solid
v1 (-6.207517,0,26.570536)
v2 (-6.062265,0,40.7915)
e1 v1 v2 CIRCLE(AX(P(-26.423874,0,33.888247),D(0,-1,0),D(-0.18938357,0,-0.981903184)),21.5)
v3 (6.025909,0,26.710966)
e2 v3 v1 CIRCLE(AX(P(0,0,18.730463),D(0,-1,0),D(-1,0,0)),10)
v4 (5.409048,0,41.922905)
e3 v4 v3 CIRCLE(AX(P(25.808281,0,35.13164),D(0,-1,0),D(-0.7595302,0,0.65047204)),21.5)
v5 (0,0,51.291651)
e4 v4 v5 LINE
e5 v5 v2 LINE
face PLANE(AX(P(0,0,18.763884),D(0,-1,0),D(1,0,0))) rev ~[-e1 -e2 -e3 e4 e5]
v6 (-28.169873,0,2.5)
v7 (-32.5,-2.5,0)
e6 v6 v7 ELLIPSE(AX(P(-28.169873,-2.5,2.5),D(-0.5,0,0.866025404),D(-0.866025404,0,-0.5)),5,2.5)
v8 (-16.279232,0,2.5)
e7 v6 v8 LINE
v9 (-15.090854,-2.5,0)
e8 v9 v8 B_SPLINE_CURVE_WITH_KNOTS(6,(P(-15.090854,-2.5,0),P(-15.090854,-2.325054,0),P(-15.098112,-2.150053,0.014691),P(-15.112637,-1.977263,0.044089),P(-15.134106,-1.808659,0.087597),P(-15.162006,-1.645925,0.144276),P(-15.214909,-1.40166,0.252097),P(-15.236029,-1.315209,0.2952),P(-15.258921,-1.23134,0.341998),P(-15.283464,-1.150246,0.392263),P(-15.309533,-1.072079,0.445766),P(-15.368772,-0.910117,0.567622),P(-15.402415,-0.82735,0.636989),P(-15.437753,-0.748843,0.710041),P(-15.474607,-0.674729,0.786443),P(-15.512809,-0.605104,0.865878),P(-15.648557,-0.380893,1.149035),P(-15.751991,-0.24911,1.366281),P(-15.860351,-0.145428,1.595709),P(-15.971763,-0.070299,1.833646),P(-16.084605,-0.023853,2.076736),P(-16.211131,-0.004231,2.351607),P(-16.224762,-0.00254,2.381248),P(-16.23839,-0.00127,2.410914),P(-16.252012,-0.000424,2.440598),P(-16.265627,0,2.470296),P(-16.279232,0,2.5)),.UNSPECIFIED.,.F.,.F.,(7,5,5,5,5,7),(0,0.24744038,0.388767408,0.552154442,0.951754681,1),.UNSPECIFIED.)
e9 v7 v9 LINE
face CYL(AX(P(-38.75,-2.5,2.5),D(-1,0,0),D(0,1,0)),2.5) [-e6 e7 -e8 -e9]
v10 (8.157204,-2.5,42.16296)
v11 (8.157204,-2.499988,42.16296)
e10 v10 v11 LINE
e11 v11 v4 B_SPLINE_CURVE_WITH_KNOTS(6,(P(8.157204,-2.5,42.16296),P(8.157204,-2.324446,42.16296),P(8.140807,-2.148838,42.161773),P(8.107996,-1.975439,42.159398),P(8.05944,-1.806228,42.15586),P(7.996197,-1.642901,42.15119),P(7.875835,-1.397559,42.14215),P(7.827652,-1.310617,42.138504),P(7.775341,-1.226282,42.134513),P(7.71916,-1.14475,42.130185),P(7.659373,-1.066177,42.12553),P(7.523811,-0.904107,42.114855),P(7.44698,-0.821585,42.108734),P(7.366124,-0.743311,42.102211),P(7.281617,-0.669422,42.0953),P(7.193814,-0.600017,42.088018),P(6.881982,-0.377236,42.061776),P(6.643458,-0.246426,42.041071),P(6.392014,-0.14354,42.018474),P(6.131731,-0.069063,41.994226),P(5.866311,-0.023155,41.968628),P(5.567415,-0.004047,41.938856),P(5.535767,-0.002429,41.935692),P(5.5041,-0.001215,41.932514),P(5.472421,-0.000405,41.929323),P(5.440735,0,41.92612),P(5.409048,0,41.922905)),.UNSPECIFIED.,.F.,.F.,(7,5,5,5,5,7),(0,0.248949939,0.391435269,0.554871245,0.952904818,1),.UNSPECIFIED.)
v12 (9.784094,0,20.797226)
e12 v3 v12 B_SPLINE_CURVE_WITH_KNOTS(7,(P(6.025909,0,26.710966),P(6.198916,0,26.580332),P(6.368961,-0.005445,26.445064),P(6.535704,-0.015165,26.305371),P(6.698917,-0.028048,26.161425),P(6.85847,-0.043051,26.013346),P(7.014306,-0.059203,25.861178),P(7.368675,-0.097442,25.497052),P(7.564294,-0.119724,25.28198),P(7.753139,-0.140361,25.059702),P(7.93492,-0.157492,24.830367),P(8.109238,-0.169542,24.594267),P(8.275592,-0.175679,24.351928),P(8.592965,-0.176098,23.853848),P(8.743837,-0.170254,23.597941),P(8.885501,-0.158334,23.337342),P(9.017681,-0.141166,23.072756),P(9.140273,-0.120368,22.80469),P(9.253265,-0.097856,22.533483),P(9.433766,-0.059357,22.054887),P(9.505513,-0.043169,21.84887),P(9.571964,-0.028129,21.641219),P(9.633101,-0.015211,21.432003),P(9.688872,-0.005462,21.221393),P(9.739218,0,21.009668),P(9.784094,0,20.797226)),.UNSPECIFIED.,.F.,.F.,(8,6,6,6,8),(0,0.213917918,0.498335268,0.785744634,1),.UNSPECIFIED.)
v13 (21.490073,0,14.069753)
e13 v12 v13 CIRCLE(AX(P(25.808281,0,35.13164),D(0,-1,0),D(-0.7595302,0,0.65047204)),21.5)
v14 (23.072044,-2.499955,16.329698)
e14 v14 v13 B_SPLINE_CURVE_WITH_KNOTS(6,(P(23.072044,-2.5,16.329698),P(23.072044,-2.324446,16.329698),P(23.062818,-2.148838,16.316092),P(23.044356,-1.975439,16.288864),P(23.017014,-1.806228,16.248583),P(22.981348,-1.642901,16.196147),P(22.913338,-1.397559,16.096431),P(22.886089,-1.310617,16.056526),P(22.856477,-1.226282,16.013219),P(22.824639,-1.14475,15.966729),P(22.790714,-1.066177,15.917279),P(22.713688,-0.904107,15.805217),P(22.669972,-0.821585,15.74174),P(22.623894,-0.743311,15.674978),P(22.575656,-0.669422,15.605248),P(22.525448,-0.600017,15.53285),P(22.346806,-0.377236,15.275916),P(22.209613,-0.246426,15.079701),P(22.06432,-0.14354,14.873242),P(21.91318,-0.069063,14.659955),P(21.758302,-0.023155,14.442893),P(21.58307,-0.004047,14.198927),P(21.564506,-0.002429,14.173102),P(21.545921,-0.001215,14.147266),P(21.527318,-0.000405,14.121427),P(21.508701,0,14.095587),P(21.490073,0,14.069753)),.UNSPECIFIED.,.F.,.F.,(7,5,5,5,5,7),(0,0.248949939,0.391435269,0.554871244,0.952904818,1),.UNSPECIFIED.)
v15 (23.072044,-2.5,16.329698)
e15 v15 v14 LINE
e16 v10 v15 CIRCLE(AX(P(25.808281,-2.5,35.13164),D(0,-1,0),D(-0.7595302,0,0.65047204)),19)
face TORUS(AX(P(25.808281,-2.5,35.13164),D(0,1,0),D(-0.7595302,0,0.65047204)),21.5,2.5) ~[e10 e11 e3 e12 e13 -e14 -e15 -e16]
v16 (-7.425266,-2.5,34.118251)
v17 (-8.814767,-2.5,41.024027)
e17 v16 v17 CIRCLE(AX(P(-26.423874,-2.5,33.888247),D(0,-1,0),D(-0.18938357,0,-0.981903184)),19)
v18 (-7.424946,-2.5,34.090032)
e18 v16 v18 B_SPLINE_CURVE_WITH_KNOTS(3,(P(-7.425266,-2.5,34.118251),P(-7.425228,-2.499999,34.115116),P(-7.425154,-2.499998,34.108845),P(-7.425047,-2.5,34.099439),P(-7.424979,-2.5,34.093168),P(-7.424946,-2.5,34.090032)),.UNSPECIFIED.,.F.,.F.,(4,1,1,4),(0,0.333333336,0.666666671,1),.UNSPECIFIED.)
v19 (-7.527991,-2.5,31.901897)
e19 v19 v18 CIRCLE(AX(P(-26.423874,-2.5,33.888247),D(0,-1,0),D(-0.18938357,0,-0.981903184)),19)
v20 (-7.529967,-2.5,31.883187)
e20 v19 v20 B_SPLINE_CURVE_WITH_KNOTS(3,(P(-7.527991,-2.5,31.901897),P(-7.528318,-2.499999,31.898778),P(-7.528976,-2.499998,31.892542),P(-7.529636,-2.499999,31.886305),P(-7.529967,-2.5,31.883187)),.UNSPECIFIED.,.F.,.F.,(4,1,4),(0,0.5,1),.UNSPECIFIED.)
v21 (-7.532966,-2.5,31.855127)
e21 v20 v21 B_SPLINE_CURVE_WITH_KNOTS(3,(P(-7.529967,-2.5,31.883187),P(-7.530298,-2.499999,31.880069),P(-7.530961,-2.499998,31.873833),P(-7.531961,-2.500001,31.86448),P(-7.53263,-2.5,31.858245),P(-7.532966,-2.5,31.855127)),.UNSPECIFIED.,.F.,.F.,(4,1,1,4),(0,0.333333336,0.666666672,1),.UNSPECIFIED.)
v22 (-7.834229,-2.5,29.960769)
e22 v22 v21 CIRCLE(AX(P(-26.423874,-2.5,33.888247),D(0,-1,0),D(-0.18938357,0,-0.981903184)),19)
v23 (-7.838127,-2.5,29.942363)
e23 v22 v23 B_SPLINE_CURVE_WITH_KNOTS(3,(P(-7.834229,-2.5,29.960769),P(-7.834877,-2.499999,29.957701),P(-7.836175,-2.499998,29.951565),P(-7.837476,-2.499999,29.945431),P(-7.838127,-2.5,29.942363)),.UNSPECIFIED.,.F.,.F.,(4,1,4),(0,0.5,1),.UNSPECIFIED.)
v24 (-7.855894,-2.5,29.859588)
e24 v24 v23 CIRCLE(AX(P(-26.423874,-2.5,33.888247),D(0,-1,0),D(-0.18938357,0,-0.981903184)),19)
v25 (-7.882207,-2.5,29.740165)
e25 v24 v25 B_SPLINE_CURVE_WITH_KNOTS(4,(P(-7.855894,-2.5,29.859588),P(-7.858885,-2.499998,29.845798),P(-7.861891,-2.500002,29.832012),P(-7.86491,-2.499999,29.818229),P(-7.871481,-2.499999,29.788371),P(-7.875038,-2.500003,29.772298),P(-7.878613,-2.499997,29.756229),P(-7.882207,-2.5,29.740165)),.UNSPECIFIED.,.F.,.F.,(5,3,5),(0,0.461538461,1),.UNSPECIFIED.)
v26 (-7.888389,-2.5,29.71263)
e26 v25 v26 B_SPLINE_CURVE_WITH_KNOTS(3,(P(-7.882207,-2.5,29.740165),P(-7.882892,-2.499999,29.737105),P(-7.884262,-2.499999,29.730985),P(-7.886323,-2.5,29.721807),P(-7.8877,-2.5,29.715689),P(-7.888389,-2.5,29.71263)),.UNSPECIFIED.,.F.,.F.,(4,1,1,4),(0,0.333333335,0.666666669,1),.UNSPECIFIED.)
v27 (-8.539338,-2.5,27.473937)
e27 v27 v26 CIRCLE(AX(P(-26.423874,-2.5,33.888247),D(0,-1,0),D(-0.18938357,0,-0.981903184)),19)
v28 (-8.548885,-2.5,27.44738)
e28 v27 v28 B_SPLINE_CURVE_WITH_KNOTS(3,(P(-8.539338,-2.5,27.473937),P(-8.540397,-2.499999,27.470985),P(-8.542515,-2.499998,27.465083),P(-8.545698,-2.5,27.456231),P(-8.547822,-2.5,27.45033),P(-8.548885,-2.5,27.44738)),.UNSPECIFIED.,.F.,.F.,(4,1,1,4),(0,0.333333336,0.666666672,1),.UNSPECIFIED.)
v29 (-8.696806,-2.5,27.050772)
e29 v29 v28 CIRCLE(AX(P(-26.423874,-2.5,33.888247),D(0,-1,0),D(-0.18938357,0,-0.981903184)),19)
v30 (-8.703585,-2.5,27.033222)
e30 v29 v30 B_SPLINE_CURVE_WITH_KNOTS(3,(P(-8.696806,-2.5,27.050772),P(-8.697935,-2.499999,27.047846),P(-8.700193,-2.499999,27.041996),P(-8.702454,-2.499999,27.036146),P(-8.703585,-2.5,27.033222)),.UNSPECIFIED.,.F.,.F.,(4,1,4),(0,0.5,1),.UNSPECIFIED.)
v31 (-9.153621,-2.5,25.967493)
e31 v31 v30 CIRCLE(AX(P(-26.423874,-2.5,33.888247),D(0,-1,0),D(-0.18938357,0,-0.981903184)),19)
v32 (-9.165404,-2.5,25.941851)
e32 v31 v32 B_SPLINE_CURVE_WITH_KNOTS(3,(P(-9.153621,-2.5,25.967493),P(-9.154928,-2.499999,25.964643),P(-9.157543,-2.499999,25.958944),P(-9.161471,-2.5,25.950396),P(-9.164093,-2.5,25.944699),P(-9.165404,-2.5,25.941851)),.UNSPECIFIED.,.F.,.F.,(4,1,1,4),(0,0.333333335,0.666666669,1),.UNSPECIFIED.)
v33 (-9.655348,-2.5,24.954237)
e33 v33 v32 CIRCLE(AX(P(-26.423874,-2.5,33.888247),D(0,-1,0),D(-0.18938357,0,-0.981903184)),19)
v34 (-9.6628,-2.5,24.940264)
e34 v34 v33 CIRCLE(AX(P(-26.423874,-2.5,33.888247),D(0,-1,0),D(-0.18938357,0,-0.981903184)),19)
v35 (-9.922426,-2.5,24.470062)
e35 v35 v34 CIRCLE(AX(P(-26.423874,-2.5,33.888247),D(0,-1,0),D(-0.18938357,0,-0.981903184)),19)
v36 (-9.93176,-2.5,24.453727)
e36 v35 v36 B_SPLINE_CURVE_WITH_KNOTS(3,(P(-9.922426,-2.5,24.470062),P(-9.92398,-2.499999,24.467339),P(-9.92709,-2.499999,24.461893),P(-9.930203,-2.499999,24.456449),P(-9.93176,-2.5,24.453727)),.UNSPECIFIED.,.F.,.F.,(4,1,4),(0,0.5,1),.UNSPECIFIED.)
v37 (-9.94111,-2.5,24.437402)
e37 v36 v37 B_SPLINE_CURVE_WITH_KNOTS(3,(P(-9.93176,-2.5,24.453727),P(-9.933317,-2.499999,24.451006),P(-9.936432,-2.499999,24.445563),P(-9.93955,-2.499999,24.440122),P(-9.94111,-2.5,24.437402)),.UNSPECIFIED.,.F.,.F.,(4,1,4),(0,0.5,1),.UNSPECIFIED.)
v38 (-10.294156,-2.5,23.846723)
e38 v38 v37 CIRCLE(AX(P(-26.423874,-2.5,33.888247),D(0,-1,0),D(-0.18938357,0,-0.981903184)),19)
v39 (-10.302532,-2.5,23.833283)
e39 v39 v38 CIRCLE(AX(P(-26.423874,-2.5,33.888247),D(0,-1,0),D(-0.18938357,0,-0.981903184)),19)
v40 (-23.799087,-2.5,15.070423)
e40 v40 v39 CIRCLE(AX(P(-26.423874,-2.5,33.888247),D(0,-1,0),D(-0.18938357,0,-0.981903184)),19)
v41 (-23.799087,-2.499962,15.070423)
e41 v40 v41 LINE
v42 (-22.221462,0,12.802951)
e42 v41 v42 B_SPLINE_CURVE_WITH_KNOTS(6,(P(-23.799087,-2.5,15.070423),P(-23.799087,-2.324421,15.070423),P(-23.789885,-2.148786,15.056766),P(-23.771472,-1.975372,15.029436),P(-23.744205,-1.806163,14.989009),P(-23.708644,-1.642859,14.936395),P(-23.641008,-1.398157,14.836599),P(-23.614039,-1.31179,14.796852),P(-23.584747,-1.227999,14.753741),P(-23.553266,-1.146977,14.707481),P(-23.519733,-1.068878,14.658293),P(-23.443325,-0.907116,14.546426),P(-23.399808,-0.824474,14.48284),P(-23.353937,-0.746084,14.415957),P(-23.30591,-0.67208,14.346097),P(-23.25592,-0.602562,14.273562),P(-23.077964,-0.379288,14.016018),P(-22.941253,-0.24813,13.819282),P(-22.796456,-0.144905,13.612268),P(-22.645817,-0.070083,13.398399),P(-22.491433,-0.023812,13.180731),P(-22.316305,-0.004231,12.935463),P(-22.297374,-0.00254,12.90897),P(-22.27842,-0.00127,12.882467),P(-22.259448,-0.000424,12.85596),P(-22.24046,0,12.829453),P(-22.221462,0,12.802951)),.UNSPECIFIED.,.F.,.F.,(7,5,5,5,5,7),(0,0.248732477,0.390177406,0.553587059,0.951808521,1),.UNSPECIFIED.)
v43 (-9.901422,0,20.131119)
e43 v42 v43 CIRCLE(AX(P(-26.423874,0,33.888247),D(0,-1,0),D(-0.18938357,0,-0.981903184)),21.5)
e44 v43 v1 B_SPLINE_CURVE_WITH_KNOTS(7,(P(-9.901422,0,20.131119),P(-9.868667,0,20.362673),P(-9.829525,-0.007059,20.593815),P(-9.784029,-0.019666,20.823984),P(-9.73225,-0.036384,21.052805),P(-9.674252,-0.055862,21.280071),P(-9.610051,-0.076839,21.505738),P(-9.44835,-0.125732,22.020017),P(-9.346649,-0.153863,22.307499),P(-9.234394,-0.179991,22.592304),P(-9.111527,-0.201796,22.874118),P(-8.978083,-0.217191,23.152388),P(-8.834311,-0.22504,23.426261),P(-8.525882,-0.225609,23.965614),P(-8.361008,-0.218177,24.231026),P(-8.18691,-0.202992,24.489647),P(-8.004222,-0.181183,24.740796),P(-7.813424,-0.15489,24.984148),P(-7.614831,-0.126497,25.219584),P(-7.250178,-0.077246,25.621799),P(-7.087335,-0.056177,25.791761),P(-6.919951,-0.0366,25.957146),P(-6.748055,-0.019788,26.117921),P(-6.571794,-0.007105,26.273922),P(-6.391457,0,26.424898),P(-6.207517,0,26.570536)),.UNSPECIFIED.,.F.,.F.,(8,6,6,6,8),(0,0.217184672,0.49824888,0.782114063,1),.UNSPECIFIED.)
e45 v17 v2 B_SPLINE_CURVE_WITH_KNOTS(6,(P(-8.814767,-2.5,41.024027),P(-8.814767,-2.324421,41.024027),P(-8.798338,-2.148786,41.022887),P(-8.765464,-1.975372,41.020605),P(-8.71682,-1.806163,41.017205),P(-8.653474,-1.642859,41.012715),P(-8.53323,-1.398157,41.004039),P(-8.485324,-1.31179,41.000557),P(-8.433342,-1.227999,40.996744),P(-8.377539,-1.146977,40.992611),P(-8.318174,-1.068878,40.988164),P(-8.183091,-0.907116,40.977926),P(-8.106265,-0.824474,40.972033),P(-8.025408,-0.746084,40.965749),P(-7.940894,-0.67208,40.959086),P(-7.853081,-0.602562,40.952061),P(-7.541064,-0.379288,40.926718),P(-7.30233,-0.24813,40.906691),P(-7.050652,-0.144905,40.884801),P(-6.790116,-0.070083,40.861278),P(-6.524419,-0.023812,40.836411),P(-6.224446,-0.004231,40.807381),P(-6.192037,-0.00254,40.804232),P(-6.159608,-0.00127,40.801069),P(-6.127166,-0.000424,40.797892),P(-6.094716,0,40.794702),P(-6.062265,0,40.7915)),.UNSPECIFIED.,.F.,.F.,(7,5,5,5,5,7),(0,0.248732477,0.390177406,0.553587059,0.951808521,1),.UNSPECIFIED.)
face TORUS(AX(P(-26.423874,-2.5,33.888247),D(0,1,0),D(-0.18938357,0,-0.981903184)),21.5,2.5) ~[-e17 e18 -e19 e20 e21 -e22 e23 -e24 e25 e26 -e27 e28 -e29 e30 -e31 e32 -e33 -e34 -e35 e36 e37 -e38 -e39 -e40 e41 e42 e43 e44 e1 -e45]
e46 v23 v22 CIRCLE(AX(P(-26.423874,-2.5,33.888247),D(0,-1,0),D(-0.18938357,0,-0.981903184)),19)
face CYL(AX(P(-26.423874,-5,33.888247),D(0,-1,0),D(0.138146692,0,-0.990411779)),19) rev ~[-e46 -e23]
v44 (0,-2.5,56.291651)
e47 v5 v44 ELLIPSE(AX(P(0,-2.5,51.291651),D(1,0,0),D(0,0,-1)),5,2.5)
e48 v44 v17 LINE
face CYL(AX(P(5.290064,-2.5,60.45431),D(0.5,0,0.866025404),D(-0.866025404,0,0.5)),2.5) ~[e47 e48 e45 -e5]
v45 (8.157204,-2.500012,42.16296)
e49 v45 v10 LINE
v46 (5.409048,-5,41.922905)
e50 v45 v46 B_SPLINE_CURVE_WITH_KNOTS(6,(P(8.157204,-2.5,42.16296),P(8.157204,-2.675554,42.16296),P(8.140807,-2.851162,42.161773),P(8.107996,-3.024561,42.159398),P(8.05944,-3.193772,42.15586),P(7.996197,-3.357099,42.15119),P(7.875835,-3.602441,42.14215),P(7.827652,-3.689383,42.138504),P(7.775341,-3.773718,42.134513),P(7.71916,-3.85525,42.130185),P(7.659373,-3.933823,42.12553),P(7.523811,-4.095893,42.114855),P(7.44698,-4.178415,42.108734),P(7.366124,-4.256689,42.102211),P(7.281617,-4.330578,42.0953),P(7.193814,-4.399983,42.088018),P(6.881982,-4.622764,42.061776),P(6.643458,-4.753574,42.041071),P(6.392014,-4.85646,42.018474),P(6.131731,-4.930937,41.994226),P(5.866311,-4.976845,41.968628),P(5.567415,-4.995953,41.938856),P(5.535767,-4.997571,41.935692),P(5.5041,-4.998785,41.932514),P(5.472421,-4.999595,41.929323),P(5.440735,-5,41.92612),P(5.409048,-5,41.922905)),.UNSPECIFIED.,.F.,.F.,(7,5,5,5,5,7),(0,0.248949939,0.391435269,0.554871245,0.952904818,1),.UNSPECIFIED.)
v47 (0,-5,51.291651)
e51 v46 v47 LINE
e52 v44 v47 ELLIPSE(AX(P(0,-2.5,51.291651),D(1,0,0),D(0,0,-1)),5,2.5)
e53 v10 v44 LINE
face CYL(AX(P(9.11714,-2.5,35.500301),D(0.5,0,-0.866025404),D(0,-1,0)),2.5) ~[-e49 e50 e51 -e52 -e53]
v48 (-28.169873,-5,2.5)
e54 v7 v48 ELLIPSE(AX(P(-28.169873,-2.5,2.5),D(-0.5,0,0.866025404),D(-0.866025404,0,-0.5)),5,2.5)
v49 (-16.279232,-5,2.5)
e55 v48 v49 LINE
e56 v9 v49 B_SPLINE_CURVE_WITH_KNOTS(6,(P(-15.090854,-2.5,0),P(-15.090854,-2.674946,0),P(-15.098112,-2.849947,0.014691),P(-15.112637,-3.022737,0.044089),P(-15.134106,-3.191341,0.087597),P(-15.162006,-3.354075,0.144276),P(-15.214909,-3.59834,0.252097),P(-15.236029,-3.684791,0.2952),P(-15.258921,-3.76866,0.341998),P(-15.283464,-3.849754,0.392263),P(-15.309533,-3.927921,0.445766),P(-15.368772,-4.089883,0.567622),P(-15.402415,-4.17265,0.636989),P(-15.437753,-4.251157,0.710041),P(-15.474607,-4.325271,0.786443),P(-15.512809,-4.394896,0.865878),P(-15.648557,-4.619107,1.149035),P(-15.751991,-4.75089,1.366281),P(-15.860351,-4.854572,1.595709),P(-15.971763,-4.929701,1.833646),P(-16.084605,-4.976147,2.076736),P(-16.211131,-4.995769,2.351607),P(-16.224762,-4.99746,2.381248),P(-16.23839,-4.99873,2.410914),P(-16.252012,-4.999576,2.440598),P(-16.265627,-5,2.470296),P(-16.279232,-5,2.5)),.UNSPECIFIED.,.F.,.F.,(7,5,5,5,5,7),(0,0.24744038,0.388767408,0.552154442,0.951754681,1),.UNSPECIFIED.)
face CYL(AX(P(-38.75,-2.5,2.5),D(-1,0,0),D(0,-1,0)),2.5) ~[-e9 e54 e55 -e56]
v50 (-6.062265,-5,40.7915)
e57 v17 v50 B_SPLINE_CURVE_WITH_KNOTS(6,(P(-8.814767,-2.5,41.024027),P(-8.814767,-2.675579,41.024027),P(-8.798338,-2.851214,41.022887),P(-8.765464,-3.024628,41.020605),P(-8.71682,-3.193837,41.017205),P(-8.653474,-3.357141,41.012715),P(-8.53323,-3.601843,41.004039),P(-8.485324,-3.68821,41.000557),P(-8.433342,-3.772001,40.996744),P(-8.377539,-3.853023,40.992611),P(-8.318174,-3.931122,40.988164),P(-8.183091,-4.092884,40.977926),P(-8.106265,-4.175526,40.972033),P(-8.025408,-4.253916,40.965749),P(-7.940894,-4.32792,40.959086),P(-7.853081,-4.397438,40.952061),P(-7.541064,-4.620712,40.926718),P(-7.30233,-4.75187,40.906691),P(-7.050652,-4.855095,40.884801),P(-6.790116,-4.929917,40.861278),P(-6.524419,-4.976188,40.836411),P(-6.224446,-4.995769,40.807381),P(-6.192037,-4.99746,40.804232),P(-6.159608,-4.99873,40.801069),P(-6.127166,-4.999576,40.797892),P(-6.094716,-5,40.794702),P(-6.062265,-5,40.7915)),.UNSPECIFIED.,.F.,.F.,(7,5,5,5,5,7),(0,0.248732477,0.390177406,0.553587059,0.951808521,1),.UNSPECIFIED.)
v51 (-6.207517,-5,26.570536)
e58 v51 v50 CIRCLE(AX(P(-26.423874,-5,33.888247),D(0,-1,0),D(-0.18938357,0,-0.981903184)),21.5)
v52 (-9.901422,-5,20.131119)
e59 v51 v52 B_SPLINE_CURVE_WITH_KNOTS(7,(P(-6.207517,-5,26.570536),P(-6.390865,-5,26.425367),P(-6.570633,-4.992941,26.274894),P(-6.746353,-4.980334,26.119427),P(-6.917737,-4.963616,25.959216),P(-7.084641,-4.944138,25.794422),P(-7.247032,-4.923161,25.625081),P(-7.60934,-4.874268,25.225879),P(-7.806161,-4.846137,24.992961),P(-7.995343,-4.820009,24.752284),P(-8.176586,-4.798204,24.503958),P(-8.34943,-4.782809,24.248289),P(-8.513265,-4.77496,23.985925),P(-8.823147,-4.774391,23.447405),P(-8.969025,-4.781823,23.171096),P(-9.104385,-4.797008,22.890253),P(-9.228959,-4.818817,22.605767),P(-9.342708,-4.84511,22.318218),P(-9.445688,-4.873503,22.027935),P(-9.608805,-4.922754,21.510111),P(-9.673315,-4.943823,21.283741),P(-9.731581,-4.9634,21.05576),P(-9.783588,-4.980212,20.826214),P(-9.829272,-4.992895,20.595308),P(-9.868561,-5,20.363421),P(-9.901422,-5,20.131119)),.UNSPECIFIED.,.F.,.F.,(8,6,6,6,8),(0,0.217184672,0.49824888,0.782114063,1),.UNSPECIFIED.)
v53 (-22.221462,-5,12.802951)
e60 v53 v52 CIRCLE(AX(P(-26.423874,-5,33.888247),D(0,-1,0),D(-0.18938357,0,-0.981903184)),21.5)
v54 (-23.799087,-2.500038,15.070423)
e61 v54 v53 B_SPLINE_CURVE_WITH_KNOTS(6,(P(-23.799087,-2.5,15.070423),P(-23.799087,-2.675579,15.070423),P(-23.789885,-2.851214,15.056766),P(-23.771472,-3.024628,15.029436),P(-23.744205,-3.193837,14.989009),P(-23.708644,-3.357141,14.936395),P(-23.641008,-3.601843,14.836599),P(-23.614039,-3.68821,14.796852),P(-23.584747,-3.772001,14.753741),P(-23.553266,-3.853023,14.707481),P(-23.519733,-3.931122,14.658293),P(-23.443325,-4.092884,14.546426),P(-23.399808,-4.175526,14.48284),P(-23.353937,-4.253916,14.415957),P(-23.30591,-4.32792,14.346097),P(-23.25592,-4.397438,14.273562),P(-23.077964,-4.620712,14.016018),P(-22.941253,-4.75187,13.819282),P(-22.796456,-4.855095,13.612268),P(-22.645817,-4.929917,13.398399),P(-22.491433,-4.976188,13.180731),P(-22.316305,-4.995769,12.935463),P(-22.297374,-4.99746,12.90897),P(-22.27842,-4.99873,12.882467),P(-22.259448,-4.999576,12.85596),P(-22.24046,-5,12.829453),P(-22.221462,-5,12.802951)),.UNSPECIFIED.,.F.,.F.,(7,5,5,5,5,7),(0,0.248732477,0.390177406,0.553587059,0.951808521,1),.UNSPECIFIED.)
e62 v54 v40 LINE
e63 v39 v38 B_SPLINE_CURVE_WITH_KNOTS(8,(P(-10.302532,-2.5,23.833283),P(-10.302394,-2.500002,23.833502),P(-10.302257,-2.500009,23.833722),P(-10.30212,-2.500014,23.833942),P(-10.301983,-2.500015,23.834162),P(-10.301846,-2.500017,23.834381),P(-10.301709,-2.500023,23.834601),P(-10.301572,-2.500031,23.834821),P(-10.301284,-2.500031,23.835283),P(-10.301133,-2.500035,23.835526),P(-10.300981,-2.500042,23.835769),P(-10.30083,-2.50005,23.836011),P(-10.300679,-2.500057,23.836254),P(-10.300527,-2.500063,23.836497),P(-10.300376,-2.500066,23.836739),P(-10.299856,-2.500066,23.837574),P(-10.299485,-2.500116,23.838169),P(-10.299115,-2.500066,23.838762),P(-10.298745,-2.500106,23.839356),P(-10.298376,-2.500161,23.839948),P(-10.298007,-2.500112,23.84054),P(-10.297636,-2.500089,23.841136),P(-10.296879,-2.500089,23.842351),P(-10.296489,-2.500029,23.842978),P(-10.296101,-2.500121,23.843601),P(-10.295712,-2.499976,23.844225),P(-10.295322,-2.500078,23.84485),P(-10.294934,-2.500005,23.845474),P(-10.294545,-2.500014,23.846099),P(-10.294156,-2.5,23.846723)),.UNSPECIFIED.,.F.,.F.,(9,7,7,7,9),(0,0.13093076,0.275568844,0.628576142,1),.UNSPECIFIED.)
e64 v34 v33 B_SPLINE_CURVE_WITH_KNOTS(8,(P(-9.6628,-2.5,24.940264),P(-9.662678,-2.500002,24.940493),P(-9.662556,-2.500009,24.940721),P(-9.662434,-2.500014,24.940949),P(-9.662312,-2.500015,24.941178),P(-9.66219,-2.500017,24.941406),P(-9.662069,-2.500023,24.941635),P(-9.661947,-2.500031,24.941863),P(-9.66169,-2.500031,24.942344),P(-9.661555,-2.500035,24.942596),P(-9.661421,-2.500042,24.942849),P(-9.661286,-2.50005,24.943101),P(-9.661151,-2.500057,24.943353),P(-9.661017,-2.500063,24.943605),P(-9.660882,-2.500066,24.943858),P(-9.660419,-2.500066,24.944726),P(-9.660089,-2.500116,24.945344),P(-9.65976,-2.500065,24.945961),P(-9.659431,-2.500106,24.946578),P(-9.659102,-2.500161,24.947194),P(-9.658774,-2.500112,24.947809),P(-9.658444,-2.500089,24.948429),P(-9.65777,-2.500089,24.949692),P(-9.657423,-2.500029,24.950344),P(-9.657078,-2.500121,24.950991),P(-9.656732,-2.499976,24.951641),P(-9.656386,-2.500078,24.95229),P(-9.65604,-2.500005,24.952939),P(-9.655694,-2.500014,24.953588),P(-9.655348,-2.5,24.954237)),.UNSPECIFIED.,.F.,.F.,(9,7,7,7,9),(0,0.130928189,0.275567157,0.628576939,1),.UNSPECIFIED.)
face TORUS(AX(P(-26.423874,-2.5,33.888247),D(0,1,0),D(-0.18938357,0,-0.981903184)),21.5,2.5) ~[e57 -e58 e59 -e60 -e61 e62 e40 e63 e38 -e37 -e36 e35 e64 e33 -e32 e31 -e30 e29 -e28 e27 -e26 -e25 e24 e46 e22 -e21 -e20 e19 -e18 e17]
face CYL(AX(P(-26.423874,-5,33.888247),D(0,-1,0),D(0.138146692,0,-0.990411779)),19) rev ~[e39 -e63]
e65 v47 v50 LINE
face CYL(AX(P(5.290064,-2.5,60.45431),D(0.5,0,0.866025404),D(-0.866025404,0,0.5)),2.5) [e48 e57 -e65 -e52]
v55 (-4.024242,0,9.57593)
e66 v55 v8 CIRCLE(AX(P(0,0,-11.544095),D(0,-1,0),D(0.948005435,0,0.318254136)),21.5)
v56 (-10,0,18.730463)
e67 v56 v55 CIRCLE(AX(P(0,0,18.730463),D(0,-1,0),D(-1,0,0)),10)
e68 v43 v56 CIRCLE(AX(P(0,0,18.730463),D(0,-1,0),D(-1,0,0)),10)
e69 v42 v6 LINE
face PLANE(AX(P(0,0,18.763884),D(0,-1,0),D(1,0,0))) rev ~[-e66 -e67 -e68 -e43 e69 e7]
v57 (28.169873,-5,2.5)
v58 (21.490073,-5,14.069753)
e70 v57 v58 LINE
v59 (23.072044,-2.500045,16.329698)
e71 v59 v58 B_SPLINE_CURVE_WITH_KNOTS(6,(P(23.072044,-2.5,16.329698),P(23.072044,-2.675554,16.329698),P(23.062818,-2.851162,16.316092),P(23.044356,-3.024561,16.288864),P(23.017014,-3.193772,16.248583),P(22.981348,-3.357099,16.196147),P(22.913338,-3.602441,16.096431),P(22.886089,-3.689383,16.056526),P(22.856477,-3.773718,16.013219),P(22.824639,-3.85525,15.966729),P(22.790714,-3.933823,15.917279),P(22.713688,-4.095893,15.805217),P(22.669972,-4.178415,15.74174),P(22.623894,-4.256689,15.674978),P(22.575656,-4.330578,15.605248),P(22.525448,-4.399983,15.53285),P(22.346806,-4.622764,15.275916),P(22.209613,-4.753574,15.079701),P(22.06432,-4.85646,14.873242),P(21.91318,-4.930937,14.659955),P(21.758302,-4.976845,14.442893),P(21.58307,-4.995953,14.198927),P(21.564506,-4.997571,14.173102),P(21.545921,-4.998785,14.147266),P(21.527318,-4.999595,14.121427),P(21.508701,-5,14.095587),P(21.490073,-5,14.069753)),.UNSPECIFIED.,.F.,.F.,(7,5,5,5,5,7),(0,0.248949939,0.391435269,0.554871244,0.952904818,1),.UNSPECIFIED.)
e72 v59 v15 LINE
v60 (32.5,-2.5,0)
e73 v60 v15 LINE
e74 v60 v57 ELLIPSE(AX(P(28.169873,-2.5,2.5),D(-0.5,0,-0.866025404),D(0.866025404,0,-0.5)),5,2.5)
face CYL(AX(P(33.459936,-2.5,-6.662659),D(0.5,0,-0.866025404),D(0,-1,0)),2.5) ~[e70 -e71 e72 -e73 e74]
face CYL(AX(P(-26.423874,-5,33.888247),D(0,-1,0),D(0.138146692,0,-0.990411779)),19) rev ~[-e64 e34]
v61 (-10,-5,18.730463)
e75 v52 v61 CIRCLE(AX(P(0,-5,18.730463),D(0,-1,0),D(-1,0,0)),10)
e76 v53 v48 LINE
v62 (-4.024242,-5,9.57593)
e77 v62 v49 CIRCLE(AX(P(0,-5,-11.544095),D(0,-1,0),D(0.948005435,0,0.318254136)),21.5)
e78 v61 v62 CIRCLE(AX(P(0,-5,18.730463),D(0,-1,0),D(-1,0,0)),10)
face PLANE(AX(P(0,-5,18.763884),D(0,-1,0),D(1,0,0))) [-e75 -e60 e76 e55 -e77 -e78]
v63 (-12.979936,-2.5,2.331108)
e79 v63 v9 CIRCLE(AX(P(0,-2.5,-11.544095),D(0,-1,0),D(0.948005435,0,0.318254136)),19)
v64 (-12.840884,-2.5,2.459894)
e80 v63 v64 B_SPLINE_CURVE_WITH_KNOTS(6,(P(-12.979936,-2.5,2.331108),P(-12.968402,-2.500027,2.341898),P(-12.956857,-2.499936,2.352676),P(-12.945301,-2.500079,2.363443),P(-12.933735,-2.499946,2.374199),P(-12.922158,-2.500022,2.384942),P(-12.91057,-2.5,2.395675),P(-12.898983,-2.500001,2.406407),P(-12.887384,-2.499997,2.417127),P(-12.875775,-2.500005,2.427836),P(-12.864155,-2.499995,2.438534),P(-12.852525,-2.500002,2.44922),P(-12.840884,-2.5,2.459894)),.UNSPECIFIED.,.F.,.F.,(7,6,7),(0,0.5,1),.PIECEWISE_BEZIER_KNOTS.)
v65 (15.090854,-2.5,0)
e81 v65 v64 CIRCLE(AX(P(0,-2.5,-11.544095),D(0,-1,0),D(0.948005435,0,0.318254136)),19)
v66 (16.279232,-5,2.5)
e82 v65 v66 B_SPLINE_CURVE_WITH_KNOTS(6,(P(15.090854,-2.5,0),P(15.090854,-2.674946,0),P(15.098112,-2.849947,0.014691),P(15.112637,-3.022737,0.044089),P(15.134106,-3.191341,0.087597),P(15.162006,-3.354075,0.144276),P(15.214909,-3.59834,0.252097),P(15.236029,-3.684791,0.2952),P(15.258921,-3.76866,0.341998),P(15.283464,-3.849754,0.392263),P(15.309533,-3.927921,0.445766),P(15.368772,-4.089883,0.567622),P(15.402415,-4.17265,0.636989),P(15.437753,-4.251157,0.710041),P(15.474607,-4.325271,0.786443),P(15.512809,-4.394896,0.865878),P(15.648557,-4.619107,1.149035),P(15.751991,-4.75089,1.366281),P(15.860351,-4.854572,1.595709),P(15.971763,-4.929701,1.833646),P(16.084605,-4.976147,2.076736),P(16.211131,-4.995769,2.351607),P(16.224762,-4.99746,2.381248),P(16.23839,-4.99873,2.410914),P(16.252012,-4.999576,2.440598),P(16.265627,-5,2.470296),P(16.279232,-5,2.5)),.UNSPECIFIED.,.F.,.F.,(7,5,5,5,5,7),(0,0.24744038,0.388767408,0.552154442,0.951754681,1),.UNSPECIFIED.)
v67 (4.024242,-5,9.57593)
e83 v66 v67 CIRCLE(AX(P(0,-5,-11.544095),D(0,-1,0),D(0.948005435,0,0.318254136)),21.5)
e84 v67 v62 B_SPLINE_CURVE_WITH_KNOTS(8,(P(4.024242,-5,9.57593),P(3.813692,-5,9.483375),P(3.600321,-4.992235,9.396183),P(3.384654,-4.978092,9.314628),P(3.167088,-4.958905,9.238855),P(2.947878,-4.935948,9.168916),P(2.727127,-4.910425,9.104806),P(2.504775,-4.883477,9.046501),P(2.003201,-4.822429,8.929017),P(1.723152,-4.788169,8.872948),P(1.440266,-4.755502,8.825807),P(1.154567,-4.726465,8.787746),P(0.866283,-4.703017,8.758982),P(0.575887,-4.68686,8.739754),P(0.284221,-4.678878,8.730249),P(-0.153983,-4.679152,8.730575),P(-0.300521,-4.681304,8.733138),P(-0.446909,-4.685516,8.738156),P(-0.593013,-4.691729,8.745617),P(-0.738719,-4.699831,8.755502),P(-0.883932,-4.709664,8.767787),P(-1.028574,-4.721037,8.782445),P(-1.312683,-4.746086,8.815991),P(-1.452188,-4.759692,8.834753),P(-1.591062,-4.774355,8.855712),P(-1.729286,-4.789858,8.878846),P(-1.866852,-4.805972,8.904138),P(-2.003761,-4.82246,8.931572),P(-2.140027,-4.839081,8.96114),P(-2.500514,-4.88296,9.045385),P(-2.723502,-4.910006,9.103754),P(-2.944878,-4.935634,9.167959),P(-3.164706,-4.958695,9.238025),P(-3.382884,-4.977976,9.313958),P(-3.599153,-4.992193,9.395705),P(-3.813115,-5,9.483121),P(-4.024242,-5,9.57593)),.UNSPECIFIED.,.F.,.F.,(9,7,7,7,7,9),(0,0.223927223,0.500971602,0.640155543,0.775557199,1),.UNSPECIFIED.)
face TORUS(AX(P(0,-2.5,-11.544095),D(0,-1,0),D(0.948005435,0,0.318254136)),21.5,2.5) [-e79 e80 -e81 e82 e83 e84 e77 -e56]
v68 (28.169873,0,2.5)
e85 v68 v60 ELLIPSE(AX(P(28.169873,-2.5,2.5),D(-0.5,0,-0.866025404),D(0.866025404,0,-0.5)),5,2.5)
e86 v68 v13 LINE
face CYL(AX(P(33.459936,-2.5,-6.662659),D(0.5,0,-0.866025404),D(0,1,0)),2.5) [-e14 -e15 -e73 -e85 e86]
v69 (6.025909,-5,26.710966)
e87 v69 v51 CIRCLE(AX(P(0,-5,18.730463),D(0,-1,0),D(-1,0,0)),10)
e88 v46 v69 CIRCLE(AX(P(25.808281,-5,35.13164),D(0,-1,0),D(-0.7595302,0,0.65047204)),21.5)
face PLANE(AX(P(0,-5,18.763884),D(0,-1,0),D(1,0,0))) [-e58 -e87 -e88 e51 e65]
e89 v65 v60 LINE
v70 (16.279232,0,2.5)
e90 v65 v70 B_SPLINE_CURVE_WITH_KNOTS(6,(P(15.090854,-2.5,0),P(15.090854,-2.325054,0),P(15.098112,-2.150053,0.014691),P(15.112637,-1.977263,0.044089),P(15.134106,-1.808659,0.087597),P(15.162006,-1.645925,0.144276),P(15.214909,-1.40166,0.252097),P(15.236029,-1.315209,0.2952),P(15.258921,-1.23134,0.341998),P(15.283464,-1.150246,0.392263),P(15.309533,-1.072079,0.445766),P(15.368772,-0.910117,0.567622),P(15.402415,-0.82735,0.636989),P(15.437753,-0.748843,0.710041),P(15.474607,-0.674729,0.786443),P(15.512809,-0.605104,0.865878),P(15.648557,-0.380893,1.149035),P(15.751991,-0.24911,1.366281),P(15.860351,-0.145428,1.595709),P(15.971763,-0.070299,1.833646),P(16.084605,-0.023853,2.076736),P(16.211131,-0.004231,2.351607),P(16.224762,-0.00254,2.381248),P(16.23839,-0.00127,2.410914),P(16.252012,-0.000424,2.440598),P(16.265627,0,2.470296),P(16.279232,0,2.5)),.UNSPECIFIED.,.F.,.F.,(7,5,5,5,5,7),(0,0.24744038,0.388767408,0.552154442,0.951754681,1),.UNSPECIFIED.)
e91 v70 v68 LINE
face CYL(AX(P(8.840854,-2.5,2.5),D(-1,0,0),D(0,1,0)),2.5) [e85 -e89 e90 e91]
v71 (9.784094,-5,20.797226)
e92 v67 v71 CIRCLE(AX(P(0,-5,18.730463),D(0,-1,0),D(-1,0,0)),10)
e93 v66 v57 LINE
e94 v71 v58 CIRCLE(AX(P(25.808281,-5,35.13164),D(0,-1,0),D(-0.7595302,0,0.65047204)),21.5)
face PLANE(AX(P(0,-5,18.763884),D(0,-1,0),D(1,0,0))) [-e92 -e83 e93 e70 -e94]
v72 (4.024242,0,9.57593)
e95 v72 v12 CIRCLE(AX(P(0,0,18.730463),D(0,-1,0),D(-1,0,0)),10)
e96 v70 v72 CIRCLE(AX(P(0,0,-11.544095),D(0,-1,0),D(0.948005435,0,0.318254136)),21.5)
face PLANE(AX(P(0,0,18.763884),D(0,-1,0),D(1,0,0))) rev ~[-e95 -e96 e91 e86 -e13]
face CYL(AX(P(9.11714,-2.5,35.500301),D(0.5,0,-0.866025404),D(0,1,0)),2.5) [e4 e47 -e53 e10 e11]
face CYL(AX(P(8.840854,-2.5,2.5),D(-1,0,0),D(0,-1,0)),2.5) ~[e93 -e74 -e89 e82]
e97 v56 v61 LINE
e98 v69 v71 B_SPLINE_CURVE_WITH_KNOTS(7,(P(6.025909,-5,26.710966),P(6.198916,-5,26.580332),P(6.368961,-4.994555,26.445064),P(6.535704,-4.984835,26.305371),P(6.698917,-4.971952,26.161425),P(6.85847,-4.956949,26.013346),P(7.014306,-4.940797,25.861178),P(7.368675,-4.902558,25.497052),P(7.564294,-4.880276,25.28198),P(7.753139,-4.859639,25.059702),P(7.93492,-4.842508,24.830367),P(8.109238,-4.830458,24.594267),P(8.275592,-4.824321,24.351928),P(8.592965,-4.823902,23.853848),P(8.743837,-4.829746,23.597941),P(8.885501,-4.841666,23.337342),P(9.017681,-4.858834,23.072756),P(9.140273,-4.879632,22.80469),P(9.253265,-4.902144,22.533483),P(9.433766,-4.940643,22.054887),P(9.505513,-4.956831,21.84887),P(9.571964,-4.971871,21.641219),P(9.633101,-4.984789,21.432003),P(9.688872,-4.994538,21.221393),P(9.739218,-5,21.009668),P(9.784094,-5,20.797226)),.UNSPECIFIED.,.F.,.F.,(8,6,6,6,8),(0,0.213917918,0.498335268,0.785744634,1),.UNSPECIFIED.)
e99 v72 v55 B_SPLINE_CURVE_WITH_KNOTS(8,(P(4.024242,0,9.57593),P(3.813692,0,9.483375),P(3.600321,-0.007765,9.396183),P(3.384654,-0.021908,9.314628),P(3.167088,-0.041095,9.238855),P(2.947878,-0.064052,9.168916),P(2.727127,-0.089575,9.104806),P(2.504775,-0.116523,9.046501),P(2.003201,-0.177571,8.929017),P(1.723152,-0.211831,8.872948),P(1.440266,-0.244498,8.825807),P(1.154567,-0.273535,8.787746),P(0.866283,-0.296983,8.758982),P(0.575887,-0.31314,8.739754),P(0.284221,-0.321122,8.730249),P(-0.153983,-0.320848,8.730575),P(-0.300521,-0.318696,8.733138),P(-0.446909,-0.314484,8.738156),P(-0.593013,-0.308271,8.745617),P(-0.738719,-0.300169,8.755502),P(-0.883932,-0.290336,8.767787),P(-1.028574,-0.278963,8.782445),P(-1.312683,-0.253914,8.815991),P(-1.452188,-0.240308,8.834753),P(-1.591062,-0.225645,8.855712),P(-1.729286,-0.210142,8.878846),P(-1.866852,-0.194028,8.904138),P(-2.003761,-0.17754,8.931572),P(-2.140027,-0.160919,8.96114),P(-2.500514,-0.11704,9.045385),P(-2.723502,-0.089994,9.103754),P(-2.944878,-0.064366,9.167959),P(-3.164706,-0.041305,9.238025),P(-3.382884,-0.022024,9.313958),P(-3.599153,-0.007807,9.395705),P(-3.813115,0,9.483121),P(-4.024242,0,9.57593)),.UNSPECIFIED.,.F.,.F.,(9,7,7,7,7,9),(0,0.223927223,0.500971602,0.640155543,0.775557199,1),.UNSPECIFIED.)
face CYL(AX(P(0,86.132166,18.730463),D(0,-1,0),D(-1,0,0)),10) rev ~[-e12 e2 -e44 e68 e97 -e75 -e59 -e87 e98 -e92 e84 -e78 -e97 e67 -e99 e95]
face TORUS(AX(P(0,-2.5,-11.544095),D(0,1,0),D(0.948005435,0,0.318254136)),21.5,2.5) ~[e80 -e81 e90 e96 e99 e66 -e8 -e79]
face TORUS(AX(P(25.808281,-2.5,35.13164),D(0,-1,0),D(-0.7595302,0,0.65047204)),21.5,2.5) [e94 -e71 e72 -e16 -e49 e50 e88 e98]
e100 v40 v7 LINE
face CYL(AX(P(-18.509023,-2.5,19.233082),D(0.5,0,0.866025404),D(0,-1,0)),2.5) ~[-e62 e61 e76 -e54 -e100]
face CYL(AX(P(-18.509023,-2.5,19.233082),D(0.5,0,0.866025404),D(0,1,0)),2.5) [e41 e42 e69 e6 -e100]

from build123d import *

# Parameters (mm, degrees)
F2_DEPTH     = 5
F3_D         = 20
F5_DEPTH     = 5
F7_T1_DEPTH  = 28.8144071543
F7_T3_DEPTH  = 30.1295341717
F7_T5_DEPTH  = 31.3559112982
F7_T7_DEPTH  = 29.9091460928
F7_T9_DEPTH  = 29.9091460928
F7_T11_DEPTH = 29.9018260823
F7_T14_ANGLE = 141.1544022781
F7_T16_ANGLE = 142.8852494642
F7_T18_ANGLE = 141.8336244917
F7_T20_ANGLE = 141.8336244917
F7_T22_ANGLE = 141.1544022781
F7_T24_ANGLE = 142.8852494642


# Not quite as in the source:
# - a fillet or chamfer that OpenCascade refuses, or shapes differently, is made with other operations: its cross-section is extruded or revolved along the edge and cut away or added
# - a feature of the source that left no trace in its solid (it failed there, or was rolled back) is left out


with BuildPart() as f2:
    # F0 (on Front) → F2 (new body)
    with BuildSketch(Plane.XZ):
        Polygon((0, 56.291651246), (-32.5, 0), (32.5, 0), align=None)
    extrude(amount=F2_DEPTH)

    # F3 (through all)
    with Locations(Plane(origin=(0, 0, 0), x_dir=(1, 0, 0), z_dir=(0, 1, 0))):
        with Locations((0, -18.7304634601)):
            Hole(F3_D / 2)

    # F4 (on face) → F5 (cut)
    with BuildSketch(Plane.XZ.offset(5)):
        with BuildLine():
            Line((-8.8147670858, 41.0240267964), (-23.7990869589, 15.0704234595))
            ThreePointArc((-23.7990869589, 15.0704234595), (-9.9693914422, 24.3882472548), (-8.8147670858, 41.0240267964))
        make_face()
        with BuildLine():
            Line((23.0720443509, 16.3296981957), (8.1572035772, 42.1629602027))
            ThreePointArc((8.1572035772, 42.1629602027), (9.353798316, 25.631639826), (23.0720443509, 16.3296981957))
        make_face()
        with BuildLine():
            ThreePointArc((15.0908539072, 0), (0, 7.455905044), (-15.0908539072, 0))
            Line((-15.0908539072, 0), (15.0908539072, 0))
        make_face()
    extrude(amount=-F5_DEPTH, mode=Mode.SUBTRACT)

    # F7: fillet of radius 2.5 on 18 edges, made by hand

    # F7_s2 → F7_t1 (cut)
    with BuildSketch(Plane(origin=(-13.0927964228, 0, 22.6773886175), x_dir=(0, 1, 0), z_dir=(-0.5, 0, 0.8660254038))):
        with BuildLine():
            ThreePointArc((0, -25.645825623), (-0.732233047, -27.413592576), (-2.5, -28.145825623))
            Line((-2.5, -28.145825623), (0, -28.145825623))
            Line((0, -28.145825623), (0, -25.645825623))
        make_face()
        with BuildLine():
            ThreePointArc((-5, -25.645825623), (-4.267766953, -27.413592576), (-2.5, -28.145825623))
            Line((-2.5, -28.145825623), (-5, -28.145825623))
            Line((-5, -28.145825623), (-5, -25.645825623))
        make_face()
    extrude(amount=F7_T1_DEPTH, mode=Mode.SUBTRACT)

    # F7_s4 → F7_t3 (cut)
    with BuildSketch(Plane(origin=(27.5, 0, 47.6313972081), x_dir=(0, 1, 0), z_dir=(-0.5, 0, -0.8660254038))):
        with BuildLine():
            ThreePointArc((-2.5, -28.145825623), (-0.732233047, -27.413592576), (0, -25.645825623))
            Line((0, -25.645825623), (0, -28.145825623))
            Line((0, -28.145825623), (-2.5, -28.145825623))
        make_face()
        with BuildLine():
            ThreePointArc((-2.5, -28.145825623), (-4.267766953, -27.413592576), (-5, -25.645825623))
            Line((-5, -25.645825623), (-5, -28.145825623))
            Line((-5, -28.145825623), (-2.5, -28.145825623))
        make_face()
    extrude(amount=F7_T3_DEPTH, mode=Mode.SUBTRACT)

    # F7_s6 → F7_t5 (cut)
    with BuildSketch(Plane(origin=(11.25, 0, -19.4855715851), x_dir=(0, 1, 0), z_dir=(-0.5, 0, 0.8660254038))):
        with BuildLine():
            ThreePointArc((0, -25.645825623), (-0.732233047, -27.413592576), (-2.5, -28.145825623))
            Line((-2.5, -28.145825623), (0, -28.145825623))
            Line((0, -28.145825623), (0, -25.645825623))
        make_face()
        with BuildLine():
            ThreePointArc((-5, -25.645825623), (-4.267766953, -27.413592576), (-2.5, -28.145825623))
            Line((-2.5, -28.145825623), (-5, -28.145825623))
            Line((-5, -28.145825623), (-5, -25.645825623))
        make_face()
    extrude(amount=F7_T5_DEPTH, mode=Mode.SUBTRACT)

    # F7_s8 → F7_t7 (cut)
    with BuildSketch(Plane.YZ.offset(8.8408539072)):
        with BuildLine():
            ThreePointArc((0, 2.5), (-0.732233047, 0.732233047), (-2.5, 0))
            Line((-2.5, 0), (0, 0))
            Line((0, 0), (0, 2.5))
        make_face()
        with BuildLine():
            ThreePointArc((-5, 2.5), (-4.267766953, 0.732233047), (-2.5, 0))
            Line((-2.5, 0), (-5, 0))
            Line((-5, 0), (-5, 2.5))
        make_face()
    extrude(amount=F7_T7_DEPTH, mode=Mode.SUBTRACT)

    # F7_s10 → F7_t9 (cut)
    with BuildSketch(Plane.YZ.offset(-38.75)):
        with BuildLine():
            ThreePointArc((0, 2.5), (-0.732233047, 0.732233047), (-2.5, 0))
            Line((-2.5, 0), (0, 0))
            Line((0, 0), (0, 2.5))
        make_face()
        with BuildLine():
            ThreePointArc((-5, 2.5), (-4.267766953, 0.732233047), (-2.5, 0))
            Line((-2.5, 0), (-5, 0))
            Line((-5, 0), (-5, 2.5))
        make_face()
    extrude(amount=F7_T9_DEPTH, mode=Mode.SUBTRACT)

    # F7_s12 → F7_t11 (cut)
    with BuildSketch(Plane(origin=(3.7009130411, 0, 6.4101694217), x_dir=(0, 1, 0), z_dir=(-0.5, 0, -0.8660254038))):
        with BuildLine():
            ThreePointArc((0, -25.645825623), (-0.732233047, -27.413592576), (-2.5, -28.145825623))
            Line((-2.5, -28.145825623), (0, -28.145825623))
            Line((0, -28.145825623), (0, -25.645825623))
        make_face()
        with BuildLine():
            ThreePointArc((-5, -25.645825623), (-4.267766953, -27.413592576), (-2.5, -28.145825623))
            Line((-2.5, -28.145825623), (-5, -28.145825623))
            Line((-5, -28.145825623), (-5, -25.645825623))
        make_face()
    extrude(amount=F7_T11_DEPTH, mode=Mode.SUBTRACT)

    # F7_s13 → F7_t14 (revolve, cut)
    with BuildSketch(Plane(origin=(28.2767394092, 0, 33.0176183098), x_dir=(0, 1, 0), z_dir=(0.6504720402, 0, 0.7595302002))):
        with BuildLine():
            ThreePointArc((0, 24.7499806074), (-0.732233047, 22.9822136544), (-2.5, 22.2499806074))
            Line((-2.5, 22.2499806074), (0, 22.2499806074))
            Line((0, 22.2499806074), (0, 24.7499806074))
        make_face()
    revolve(axis=Axis((25.8082809879, 0, 35.131639826), (0, -1, 0)), revolution_arc=F7_T14_ANGLE, mode=Mode.SUBTRACT)

    # F7_s15 → F7_t16 (revolve, cut)
    with BuildSketch(Plane(origin=(3.4829302285, 0, -10.374843271), x_dir=(0, 1, 0), z_dir=(0.3182541365, 0, -0.9480054349))):
        with BuildLine():
            ThreePointArc((0, 17.8260440287), (-0.732233047, 16.0582770757), (-2.5, 15.3260440287))
            Line((-2.5, 15.3260440287), (0, 15.3260440287))
            Line((0, 15.3260440287), (0, 17.8260440287))
        make_face()
    revolve(axis=Axis((0, 0, -11.544094956), (0, -1, 0)), revolution_arc=F7_T16_ANGLE, mode=Mode.SUBTRACT)

    # F7_s17 → F7_t18 (revolve, cut)
    with BuildSketch(Plane(origin=(-31.7778859418, 0, 6.129127173), x_dir=(0, 1, 0), z_dir=(-0.9819031843, 0, 0.1893835701))):
        with BuildLine():
            ThreePointArc((0, -6.7707302764), (-0.732233047, -8.5384972294), (-2.5, -9.2707302764))
            Line((-2.5, -9.2707302764), (0, -9.2707302764))
            Line((0, -9.2707302764), (0, -6.7707302764))
        make_face()
    revolve(axis=Axis((-26.4238741141, 0, 33.8882472548), (0, -1, 0)), revolution_arc=F7_T18_ANGLE, mode=Mode.SUBTRACT)

    # F7_s19 → F7_t20 (revolve, cut)
    with BuildSketch(Plane(origin=(-31.7778859418, 0, 6.129127173), x_dir=(0, 1, 0), z_dir=(-0.9819031843, 0, 0.1893835701))):
        with BuildLine():
            ThreePointArc((-2.5, -9.2707302764), (-4.267766953, -8.5384972294), (-5, -6.7707302764))
            Line((-5, -6.7707302764), (-5, -9.2707302764))
            Line((-5, -9.2707302764), (-2.5, -9.2707302764))
        make_face()
    revolve(axis=Axis((-26.4238741141, -5, 33.8882472548), (0, -1, 0)), revolution_arc=F7_T20_ANGLE, mode=Mode.SUBTRACT)

    # F7_s21 → F7_t22 (revolve, cut)
    with BuildSketch(Plane(origin=(28.2767394092, 0, 33.0176183098), x_dir=(0, 1, 0), z_dir=(0.6504720402, 0, 0.7595302002))):
        with BuildLine():
            ThreePointArc((-5, 24.7499806074), (-4.267766953, 22.9822136544), (-2.5, 22.2499806074))
            Line((-2.5, 22.2499806074), (-5, 22.2499806074))
            Line((-5, 22.2499806074), (-5, 24.7499806074))
        make_face()
    revolve(axis=Axis((25.8082809879, -5, 35.131639826), (0, -1, 0)), revolution_arc=F7_T22_ANGLE, mode=Mode.SUBTRACT)

    # F7_s23 → F7_t24 (revolve, cut)
    with BuildSketch(Plane(origin=(3.4829302285, 0, -10.374843271), x_dir=(0, 1, 0), z_dir=(0.3182541365, 0, -0.9480054349))):
        with BuildLine():
            ThreePointArc((-5, 17.8260440287), (-4.267766953, 16.0582770757), (-2.5, 15.3260440287))
            Line((-2.5, 15.3260440287), (-5, 15.3260440287))
            Line((-5, 15.3260440287), (-5, 17.8260440287))
        make_face()
    revolve(axis=Axis((0, -5, -11.544094956), (0, -1, 0)), revolution_arc=F7_T24_ANGLE, mode=Mode.SUBTRACT)


solid = f2.part
